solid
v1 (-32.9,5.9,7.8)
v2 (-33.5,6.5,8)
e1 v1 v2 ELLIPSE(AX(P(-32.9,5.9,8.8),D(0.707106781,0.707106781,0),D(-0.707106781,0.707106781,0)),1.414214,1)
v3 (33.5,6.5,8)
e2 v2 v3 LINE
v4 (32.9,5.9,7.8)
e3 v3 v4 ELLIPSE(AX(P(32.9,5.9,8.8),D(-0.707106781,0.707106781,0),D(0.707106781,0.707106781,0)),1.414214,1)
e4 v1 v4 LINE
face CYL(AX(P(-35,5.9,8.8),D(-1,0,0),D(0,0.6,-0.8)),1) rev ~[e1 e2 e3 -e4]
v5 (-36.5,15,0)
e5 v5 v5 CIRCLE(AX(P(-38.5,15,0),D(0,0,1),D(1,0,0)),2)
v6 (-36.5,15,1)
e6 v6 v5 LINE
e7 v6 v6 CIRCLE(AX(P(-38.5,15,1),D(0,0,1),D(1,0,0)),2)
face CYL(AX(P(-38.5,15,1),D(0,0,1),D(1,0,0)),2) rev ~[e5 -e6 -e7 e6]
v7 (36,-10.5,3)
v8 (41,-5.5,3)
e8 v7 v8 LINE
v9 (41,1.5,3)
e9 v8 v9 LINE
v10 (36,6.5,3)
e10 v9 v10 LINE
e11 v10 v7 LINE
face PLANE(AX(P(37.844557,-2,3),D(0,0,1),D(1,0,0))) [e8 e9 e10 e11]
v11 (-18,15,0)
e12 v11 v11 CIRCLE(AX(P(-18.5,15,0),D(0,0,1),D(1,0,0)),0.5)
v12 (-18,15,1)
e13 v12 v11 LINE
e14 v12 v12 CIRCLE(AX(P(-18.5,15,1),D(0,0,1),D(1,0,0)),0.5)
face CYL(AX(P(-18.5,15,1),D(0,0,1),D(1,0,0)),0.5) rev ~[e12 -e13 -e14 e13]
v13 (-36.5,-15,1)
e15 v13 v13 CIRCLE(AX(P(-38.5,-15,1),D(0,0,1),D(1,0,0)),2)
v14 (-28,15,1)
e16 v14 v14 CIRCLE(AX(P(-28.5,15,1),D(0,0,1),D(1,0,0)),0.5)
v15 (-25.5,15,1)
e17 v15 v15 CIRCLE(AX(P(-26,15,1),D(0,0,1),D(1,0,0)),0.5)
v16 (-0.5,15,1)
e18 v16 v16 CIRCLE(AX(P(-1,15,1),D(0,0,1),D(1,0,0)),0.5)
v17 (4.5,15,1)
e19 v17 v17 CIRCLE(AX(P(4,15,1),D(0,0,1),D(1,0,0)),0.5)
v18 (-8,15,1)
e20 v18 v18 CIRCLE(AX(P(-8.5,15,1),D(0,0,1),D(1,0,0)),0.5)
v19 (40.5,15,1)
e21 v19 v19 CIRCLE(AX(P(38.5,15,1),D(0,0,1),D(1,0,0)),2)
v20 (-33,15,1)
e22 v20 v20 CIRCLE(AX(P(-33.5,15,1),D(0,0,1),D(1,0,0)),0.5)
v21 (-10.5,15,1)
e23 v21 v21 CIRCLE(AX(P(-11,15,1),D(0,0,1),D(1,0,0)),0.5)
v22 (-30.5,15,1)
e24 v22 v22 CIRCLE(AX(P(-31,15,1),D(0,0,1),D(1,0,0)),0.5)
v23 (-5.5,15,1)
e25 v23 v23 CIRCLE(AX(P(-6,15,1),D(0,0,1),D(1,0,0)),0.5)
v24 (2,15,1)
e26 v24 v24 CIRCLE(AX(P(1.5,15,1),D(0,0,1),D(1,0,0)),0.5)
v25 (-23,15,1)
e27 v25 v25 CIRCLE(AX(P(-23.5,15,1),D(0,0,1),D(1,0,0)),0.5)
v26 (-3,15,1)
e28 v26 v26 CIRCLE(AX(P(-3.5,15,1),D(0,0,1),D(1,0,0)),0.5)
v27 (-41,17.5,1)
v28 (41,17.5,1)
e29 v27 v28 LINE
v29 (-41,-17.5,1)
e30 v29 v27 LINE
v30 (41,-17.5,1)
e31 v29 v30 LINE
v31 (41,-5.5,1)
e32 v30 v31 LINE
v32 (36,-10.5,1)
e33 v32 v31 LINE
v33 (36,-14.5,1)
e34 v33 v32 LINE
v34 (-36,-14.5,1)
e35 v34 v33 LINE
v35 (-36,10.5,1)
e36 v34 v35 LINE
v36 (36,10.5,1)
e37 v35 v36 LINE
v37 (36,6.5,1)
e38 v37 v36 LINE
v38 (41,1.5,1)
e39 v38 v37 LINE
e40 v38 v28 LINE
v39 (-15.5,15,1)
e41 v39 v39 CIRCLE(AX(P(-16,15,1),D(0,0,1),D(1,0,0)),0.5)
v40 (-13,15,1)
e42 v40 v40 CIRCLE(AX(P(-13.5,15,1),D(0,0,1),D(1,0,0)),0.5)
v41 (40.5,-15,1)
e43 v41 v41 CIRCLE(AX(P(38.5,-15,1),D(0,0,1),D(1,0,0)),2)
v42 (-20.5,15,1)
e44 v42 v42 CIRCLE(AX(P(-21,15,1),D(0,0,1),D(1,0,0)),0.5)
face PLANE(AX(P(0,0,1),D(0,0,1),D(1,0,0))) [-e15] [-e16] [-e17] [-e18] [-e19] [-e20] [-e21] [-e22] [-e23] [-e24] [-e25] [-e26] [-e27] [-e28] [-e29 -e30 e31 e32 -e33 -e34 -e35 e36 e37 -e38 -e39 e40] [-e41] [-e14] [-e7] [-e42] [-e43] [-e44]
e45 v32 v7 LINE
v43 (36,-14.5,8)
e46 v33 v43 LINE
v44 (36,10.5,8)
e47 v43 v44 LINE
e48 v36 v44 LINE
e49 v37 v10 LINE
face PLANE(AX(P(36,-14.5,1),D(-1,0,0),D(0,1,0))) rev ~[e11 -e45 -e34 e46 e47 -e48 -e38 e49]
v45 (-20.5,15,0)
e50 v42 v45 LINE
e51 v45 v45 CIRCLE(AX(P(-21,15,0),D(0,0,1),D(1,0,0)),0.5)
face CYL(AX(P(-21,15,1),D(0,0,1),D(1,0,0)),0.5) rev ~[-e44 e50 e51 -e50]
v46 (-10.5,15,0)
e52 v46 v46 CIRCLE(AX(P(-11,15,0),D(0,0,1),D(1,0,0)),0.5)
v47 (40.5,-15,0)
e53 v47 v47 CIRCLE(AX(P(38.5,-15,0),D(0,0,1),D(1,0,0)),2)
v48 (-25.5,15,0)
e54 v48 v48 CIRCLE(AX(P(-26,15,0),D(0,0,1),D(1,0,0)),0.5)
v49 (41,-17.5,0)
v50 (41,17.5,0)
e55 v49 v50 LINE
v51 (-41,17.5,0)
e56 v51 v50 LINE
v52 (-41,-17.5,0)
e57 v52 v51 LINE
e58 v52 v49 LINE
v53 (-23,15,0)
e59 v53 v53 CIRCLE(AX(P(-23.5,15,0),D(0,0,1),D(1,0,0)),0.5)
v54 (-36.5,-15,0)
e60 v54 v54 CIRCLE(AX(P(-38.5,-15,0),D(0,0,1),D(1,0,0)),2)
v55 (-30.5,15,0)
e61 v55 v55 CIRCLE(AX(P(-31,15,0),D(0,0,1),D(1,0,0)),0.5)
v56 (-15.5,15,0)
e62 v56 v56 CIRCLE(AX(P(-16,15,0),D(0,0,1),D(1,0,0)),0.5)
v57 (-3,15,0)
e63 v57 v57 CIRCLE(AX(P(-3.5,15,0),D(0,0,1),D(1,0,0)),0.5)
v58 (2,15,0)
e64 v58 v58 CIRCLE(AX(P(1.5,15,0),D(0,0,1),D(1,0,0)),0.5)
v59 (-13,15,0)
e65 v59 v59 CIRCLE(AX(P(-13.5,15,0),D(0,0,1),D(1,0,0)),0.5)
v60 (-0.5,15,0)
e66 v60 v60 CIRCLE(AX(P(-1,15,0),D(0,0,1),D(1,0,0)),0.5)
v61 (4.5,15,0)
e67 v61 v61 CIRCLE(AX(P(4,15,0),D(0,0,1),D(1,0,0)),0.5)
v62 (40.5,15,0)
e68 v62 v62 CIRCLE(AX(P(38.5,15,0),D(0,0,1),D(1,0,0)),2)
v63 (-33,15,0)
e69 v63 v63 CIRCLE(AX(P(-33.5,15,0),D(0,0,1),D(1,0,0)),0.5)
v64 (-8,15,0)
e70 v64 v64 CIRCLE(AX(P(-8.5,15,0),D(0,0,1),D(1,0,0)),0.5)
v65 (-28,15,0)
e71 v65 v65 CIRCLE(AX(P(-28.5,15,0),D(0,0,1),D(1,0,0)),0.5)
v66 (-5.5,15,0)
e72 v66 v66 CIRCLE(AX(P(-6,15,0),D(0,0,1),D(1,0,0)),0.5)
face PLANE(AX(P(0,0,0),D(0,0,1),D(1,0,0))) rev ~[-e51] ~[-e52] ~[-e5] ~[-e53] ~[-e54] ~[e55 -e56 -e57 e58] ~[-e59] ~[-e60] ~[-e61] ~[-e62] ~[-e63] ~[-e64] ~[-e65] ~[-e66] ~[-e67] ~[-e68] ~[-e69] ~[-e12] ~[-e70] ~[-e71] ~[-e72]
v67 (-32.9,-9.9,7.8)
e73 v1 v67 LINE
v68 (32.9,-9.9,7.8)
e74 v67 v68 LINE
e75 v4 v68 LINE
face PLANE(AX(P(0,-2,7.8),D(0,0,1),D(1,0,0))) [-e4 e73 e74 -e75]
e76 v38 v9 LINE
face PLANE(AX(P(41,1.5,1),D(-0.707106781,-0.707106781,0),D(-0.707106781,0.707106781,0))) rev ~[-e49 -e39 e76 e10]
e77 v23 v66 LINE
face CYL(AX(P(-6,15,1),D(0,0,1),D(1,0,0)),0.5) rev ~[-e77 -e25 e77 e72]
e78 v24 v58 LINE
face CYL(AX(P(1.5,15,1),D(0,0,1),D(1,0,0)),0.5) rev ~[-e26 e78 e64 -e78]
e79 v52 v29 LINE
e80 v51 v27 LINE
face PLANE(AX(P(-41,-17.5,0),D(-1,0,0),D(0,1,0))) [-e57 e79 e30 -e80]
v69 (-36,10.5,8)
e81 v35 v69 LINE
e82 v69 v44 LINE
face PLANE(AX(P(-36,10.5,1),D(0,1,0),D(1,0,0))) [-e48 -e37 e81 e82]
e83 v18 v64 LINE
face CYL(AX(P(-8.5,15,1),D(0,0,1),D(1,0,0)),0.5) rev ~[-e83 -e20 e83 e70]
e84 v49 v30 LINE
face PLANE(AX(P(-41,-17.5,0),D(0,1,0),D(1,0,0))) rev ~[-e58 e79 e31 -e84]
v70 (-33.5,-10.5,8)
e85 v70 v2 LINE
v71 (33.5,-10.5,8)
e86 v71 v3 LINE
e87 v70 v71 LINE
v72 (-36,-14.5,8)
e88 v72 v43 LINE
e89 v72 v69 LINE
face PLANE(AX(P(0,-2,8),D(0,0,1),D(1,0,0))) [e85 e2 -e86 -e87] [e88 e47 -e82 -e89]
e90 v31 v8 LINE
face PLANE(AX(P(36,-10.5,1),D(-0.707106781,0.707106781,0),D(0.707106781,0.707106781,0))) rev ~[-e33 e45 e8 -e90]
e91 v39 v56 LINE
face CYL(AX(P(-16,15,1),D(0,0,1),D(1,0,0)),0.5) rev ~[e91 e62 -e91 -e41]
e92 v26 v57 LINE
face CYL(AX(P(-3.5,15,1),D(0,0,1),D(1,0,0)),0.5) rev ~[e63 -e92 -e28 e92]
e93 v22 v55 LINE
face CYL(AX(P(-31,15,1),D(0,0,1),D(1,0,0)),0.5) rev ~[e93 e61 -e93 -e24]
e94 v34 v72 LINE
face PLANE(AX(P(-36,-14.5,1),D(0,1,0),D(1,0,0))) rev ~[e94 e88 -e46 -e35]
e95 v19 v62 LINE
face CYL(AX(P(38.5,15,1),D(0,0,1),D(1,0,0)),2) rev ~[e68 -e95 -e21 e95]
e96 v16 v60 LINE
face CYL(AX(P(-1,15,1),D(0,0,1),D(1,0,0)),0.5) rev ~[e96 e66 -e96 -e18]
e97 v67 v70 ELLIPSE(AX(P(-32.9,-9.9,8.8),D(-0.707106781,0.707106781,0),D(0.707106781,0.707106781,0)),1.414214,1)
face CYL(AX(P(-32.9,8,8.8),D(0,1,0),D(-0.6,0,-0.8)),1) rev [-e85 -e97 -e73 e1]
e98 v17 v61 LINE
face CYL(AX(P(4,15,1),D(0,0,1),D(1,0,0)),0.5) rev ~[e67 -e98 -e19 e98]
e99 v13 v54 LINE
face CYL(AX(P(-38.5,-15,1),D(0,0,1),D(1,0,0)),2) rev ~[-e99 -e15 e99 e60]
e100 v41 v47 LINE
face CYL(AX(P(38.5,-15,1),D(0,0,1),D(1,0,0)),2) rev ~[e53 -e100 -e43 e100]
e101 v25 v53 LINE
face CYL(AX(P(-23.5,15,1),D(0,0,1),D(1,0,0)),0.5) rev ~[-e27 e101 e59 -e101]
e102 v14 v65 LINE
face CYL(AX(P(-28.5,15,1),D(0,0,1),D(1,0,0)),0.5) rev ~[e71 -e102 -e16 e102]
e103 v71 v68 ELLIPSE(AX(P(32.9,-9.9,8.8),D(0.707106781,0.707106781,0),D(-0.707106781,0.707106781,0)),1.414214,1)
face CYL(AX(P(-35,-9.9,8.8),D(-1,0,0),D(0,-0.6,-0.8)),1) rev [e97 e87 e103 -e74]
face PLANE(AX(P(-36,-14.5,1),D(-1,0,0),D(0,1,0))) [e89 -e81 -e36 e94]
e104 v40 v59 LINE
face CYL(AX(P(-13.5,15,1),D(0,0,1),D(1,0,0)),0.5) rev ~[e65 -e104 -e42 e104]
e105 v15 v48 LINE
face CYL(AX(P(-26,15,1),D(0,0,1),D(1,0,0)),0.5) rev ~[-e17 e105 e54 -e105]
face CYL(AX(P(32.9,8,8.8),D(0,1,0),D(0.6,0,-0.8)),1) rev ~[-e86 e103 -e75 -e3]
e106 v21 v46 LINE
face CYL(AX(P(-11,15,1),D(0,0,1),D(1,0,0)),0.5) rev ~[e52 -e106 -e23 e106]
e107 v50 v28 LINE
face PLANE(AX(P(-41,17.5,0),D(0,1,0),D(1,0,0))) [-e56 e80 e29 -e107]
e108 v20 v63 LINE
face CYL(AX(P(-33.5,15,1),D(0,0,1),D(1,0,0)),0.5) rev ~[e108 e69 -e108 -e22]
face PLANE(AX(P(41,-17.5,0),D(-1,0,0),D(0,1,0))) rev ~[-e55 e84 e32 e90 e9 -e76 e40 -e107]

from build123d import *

# Parameters (mm, degrees)
F0_W         = 82
F0_H         = 35
F1_DEPTH     = 1
F2_W         = 72
F2_H         = 25
F3_DEPTH     = 7
F5_DEPTH     = 2
F6_R         = 2
F7_DEPTH     = 2
F8_W         = 67
F8_H         = 17
F9_DEPTH     = 0.2
F10_T1_DEPTH = 20
F10_T3_DEPTH = 70
F11_R        = 0.5
F12_DEPTH    = 2


# Not quite as in the source:
# - a fillet or chamfer that OpenCascade refuses, or shapes differently, is made with other operations: its cross-section is extruded or revolved along the edge and cut away or added


with BuildPart() as f1:
    # F0 (on Top) → F1 (new body)
    with BuildSketch(Plane.XY):
        Rectangle(F0_W, F0_H)
    extrude(amount=F1_DEPTH)

    # F2 (on face) → F3 (join)
    with BuildSketch(Plane.XY.offset(1)):
        with Locations((0, -2)):
            Rectangle(F2_W, F2_H)
    extrude(amount=F3_DEPTH)

    # F4 (on face) → F5 (join)
    with BuildSketch(Plane.XY.offset(1)):
        Polygon((36, -10.5), (41, -5.5), (41, 1.5), (36, 6.5), align=None)
    extrude(amount=F5_DEPTH)

    # F6 (on face) → F7 (cut)
    with BuildSketch(Plane.XY.offset(1)):
        with Locations((-38.5, -15)):
            Circle(F6_R)
        with Locations((38.5, -15)):
            Circle(F6_R)
        with Locations((-38.5, 15)):
            Circle(F6_R)
        with Locations((38.5, 15)):
            Circle(F6_R)
    extrude(amount=-F7_DEPTH, mode=Mode.SUBTRACT)

    # F8 (on face) → F9 (cut)
    with BuildSketch(Plane.XY.offset(8)):
        with Locations((0, -2)):
            Rectangle(F8_W, F8_H)
    extrude(amount=-F9_DEPTH, mode=Mode.SUBTRACT)

    # F10: fillet of radius 1 on 4 edges, made by hand

    # F10_s2 → F10_t1 (join)
    with BuildSketch(Plane.XZ.offset(-8)):
        with BuildLine():
            ThreePointArc((33.5, 8), (33.216227766, 7.8513167019), (32.9, 7.8))
            Line((32.9, 7.8), (33.5, 7.8))
            Line((33.5, 7.8), (33.5, 8))
        make_face()
        with BuildLine():
            ThreePointArc((-33.5, 8), (-33.216227766, 7.8513167019), (-32.9, 7.8))
            Line((-32.9, 7.8), (-33.5, 7.8))
            Line((-33.5, 7.8), (-33.5, 8))
        make_face()
    extrude(amount=F10_T1_DEPTH)

    # F10_s4 → F10_t3 (join)
    with BuildSketch(Plane.YZ.offset(-35)):
        with BuildLine():
            ThreePointArc((6.5, 8), (6.216227766, 7.8513167019), (5.9, 7.8))
            Line((5.9, 7.8), (6.5, 7.8))
            Line((6.5, 7.8), (6.5, 8))
        make_face()
        with BuildLine():
            ThreePointArc((-10.5, 8), (-10.216227766, 7.8513167019), (-9.9, 7.8))
            Line((-9.9, 7.8), (-10.5, 7.8))
            Line((-10.5, 7.8), (-10.5, 8))
        make_face()
    extrude(amount=F10_T3_DEPTH)

    # F11 (on face) → F12 (cut)
    with BuildSketch(Plane.XY.offset(1)):
        with Locations((-33.5, 15)):
            Circle(F11_R)
        with Locations((-31, 15)):
            Circle(F11_R)
        with Locations((-28.5, 15)):
            Circle(F11_R)
        with Locations((-26, 15)):
            Circle(F11_R)
        with Locations((-23.5, 15)):
            Circle(F11_R)
        with Locations((-21, 15)):
            Circle(F11_R)
        with Locations((-18.5, 15)):
            Circle(F11_R)
        with Locations((-16, 15)):
            Circle(F11_R)
        with Locations((-13.5, 15)):
            Circle(F11_R)
        with Locations((-11, 15)):
            Circle(F11_R)
        with Locations((-8.5, 15)):
            Circle(F11_R)
        with Locations((-6, 15)):
            Circle(F11_R)
        with Locations((-3.5, 15)):
            Circle(F11_R)
        with Locations((-1, 15)):
            Circle(F11_R)
        with Locations((1.5, 15)):
            Circle(F11_R)
        with Locations((4, 15)):
            Circle(F11_R)
    extrude(amount=-F12_DEPTH, mode=Mode.SUBTRACT)


solid = f1.part
